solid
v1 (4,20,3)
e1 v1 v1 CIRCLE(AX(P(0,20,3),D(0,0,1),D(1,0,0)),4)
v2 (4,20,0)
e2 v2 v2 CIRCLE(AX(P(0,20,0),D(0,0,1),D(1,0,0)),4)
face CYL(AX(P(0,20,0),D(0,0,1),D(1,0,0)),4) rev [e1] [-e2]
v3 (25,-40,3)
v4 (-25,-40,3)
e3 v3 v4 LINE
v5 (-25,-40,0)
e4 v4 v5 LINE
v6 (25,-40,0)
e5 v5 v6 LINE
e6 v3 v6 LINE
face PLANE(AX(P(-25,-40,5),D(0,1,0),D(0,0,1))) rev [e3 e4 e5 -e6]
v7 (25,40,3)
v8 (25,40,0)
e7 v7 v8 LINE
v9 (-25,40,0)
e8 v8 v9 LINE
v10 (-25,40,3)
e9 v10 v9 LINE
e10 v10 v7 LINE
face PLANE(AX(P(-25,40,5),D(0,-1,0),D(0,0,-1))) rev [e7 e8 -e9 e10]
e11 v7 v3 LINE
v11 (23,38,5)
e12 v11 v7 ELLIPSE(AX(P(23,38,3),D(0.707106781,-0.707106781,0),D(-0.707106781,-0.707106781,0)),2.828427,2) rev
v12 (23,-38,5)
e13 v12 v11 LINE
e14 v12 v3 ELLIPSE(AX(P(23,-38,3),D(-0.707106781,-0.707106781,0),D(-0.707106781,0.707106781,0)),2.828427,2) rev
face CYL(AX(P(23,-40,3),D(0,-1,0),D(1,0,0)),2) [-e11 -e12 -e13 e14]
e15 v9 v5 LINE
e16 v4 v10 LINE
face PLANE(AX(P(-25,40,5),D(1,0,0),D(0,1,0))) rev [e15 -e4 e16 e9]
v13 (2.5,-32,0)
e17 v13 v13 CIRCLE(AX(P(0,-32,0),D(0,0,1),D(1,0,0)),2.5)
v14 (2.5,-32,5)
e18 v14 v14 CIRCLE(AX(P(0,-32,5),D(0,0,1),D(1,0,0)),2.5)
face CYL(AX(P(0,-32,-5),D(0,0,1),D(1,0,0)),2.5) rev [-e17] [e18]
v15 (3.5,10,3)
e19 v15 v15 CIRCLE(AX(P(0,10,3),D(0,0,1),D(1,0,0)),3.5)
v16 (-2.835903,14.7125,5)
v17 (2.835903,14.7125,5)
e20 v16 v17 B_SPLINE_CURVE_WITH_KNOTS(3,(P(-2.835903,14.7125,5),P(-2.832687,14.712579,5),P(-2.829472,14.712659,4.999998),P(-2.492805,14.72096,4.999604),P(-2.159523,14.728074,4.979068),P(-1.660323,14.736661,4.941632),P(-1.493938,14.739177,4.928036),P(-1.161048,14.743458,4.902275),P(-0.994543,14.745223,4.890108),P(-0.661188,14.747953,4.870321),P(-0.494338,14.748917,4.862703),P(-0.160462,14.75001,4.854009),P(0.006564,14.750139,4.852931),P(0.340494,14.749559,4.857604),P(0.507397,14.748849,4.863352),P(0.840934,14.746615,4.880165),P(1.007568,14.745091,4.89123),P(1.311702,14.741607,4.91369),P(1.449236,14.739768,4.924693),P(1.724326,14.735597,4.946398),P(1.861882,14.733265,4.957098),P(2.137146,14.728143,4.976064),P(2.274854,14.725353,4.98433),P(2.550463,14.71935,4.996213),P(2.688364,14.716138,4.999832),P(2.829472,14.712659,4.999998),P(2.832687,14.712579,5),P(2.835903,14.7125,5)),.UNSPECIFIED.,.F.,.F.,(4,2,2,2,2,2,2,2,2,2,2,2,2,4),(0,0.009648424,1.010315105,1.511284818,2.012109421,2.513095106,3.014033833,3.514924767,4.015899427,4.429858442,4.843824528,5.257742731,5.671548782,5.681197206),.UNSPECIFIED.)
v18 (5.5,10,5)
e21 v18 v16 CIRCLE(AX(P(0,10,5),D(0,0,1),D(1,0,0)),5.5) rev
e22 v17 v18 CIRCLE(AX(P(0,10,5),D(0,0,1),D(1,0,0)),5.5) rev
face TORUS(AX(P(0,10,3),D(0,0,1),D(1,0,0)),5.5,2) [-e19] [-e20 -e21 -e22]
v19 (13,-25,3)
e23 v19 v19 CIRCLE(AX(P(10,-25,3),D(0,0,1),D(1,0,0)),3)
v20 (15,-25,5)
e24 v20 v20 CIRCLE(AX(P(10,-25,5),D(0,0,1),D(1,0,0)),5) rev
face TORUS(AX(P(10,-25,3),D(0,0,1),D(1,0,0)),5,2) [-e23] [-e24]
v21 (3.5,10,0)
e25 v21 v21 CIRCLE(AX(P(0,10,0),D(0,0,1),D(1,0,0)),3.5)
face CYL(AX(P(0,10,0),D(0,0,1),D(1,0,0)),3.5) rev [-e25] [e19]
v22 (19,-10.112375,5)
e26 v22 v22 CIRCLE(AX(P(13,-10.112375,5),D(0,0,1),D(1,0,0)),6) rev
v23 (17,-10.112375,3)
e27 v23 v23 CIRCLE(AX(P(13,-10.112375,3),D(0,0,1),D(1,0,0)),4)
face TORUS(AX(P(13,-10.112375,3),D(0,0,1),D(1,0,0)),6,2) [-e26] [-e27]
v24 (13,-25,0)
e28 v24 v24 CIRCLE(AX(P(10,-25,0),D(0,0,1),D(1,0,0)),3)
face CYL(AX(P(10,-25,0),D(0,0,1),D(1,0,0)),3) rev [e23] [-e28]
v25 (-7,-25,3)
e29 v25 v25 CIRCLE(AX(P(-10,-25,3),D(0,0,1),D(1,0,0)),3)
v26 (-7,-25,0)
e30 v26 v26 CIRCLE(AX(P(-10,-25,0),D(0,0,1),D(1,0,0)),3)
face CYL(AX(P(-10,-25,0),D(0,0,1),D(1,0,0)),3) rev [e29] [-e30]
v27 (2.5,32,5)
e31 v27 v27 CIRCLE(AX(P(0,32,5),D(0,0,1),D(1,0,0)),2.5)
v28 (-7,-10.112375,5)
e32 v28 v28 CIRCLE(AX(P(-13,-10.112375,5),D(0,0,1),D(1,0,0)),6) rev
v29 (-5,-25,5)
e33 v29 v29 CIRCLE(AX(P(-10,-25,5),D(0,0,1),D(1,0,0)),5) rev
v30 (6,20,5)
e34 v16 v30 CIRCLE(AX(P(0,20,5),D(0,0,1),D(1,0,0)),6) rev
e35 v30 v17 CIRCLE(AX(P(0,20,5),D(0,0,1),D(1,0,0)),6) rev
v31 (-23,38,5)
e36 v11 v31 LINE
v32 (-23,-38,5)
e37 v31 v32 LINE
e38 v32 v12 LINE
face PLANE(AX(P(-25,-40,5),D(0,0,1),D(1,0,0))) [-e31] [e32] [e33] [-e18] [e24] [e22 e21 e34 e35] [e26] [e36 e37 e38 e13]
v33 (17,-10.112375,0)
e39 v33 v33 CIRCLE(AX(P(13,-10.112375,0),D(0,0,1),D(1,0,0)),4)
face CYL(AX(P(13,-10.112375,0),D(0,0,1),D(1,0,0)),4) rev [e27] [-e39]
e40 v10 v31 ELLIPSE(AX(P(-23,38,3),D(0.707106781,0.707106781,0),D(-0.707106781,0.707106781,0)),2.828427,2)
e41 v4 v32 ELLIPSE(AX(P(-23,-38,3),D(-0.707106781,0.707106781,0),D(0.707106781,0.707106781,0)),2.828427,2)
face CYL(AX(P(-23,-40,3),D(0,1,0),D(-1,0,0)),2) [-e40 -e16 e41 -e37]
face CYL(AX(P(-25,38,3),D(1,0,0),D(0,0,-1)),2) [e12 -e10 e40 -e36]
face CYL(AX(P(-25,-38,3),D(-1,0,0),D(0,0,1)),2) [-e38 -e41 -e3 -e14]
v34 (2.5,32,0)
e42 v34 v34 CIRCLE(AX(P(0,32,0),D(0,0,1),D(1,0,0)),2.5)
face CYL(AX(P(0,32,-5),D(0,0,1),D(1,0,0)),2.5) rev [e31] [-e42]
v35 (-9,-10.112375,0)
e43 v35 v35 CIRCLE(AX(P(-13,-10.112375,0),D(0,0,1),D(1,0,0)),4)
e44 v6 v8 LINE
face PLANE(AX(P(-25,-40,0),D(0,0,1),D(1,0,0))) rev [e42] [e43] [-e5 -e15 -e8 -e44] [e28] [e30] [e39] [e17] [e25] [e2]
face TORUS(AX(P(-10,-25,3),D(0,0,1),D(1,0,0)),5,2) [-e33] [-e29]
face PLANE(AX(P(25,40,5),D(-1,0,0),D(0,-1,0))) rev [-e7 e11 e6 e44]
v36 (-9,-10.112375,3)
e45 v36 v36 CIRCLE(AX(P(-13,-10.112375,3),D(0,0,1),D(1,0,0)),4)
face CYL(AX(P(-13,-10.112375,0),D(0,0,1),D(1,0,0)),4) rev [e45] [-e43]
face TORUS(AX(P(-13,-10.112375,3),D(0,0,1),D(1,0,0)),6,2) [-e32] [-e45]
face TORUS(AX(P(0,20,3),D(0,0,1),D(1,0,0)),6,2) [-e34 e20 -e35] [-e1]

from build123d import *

# Parameters (mm, degrees)
SKETCH1_W          = 50
SKETCH1_H          = 80
EXTRUDE1_DEPTH     = 5
SKETCH2_R          = 3
SKETCH2_R_2        = 4
SKETCH2_R_3        = 3.5
CUT_EXTRUDE1_DEPTH = 48.434164903
FILLET1_R          = 2
SKETCH5_R          = 2.5
CUT_EXTRUDE2_DEPTH = 10


with BuildPart() as part:
    # Sketch1 → Extrude1 (new body)
    with BuildSketch(Plane.XY):
        Rectangle(SKETCH1_W, SKETCH1_H)
    extrude(amount=EXTRUDE1_DEPTH)

    # Sketch2 → Cut-Extrude1 (cut, through all)
    with BuildSketch(Plane.XY.offset(5)):
        with Locations((-10, -25)):
            Circle(SKETCH2_R)
        with Locations((10, -25)):
            Circle(SKETCH2_R)
        with Locations((0, 20)):
            Circle(SKETCH2_R_2)
        with Locations((13, -10.112374908)):
            Circle(SKETCH2_R_2)
        with Locations((-13, -10.112374908)):
            Circle(SKETCH2_R_2)
        with Locations((0, 10)):
            Circle(SKETCH2_R_3)
    extrude(amount=-CUT_EXTRUDE1_DEPTH, mode=Mode.SUBTRACT)

    # Fillet1
    # the kernel refuses this fillet: 2 mm, written as the material it takes off along each edge
    with BuildSketch(Plane(origin=(25, 45, 5), x_dir=(0, 0, -1), z_dir=(0, -1, 0)), Plane(origin=(-25, -45, 5), x_dir=(0, 0, -1), z_dir=(0, 1, 0))) as fillet1_piece_1:
        with BuildLine():
            CenterArc((FILLET1_R, -FILLET1_R), FILLET1_R, 90, 90)
            Line((0, -FILLET1_R), (0, 0))
            Line((0, 0), (FILLET1_R, 0))
        make_face()
    extrude(amount=90, mode=Mode.SUBTRACT)
    with BuildSketch(Plane(origin=(-30, 40, 5), x_dir=(0, 0, -1), z_dir=(1, 0, 0))) as fillet1_piece_2:
        with BuildLine():
            CenterArc((FILLET1_R, -FILLET1_R), FILLET1_R, 90, 90)
            Line((0, -FILLET1_R), (0, 0))
            Line((0, 0), (FILLET1_R, 0))
        make_face()
    extrude(amount=60, mode=Mode.SUBTRACT)
    with BuildSketch(Plane(origin=(-10, -25, 5), x_dir=(1, 0, 0), z_dir=(0, -1, 0))) as fillet1_piece_3:
        with BuildLine():
            CenterArc((3 + FILLET1_R, -FILLET1_R), FILLET1_R, 90, 90)
            Line((3, -FILLET1_R), (3, 0))
            Line((3, 0), (3 + FILLET1_R, 0))
        make_face()
    revolve(axis=Axis((-10, -25, 5), (0, 0, 1)), mode=Mode.SUBTRACT)
    with BuildSketch(Plane(origin=(10, -25, 5), x_dir=(1, 0, 0), z_dir=(0, -1, 0))) as fillet1_piece_4:
        with BuildLine():
            CenterArc((3 + FILLET1_R, -FILLET1_R), FILLET1_R, 90, 90)
            Line((3, -FILLET1_R), (3, 0))
            Line((3, 0), (3 + FILLET1_R, 0))
        make_face()
    revolve(axis=Axis((10, -25, 5), (0, 0, 1)), mode=Mode.SUBTRACT)
    with BuildSketch(Plane(origin=(0, 20, 5), x_dir=(1, 0, 0), z_dir=(0, -1, 0))) as fillet1_piece_5:
        with BuildLine():
            CenterArc((4 + FILLET1_R, -FILLET1_R), FILLET1_R, 90, 90)
            Line((4, -FILLET1_R), (4, 0))
            Line((4, 0), (4 + FILLET1_R, 0))
        make_face()
    revolve(axis=Axis((0, 20, 5), (0, 0, 1)), mode=Mode.SUBTRACT)
    with BuildSketch(Plane(origin=(13, -10.112374908, 5), x_dir=(1, 0, 0), z_dir=(0, -1, 0))) as fillet1_piece_6:
        with BuildLine():
            CenterArc((4 + FILLET1_R, -FILLET1_R), FILLET1_R, 90, 90)
            Line((4, -FILLET1_R), (4, 0))
            Line((4, 0), (4 + FILLET1_R, 0))
        make_face()
    revolve(axis=Axis((13, -10.112374908, 5), (0, 0, 1)), mode=Mode.SUBTRACT)
    with BuildSketch(Plane(origin=(-13, -10.112374908, 5), x_dir=(1, 0, 0), z_dir=(0, -1, 0))) as fillet1_piece_7:
        with BuildLine():
            CenterArc((4 + FILLET1_R, -FILLET1_R), FILLET1_R, 90, 90)
            Line((4, -FILLET1_R), (4, 0))
            Line((4, 0), (4 + FILLET1_R, 0))
        make_face()
    revolve(axis=Axis((-13, -10.112374908, 5), (0, 0, 1)), mode=Mode.SUBTRACT)
    with BuildSketch(Plane(origin=(0, 10, 5), x_dir=(1, 0, 0), z_dir=(0, -1, 0))) as fillet1_piece_8:
        with BuildLine():
            CenterArc((3.5 + FILLET1_R, -FILLET1_R), FILLET1_R, 90, 90)
            Line((3.5, -FILLET1_R), (3.5, 0))
            Line((3.5, 0), (3.5 + FILLET1_R, 0))
        make_face()
    revolve(axis=Axis((0, 10, 5), (0, 0, 1)), mode=Mode.SUBTRACT)
    with BuildSketch(Plane(origin=(30, -40, 5), x_dir=(0, 1, 0), z_dir=(-1, 0, 0))) as fillet1_piece_9:
        with BuildLine():
            CenterArc((FILLET1_R, FILLET1_R), FILLET1_R, 180, 90)
            Line((0, FILLET1_R), (0, 0))
            Line((0, 0), (FILLET1_R, 0))
        make_face()
    extrude(amount=60, mode=Mode.SUBTRACT)

    # Sketch5 → Cut-Extrude2 (cut)
    with BuildSketch(Plane.XY.offset(5)):
        with Locations((0, 32)):
            Circle(SKETCH5_R)
        with Locations((0, -32)):
            Circle(SKETCH5_R)
    extrude(amount=-CUT_EXTRUDE2_DEPTH, mode=Mode.SUBTRACT)


solid = part.part
